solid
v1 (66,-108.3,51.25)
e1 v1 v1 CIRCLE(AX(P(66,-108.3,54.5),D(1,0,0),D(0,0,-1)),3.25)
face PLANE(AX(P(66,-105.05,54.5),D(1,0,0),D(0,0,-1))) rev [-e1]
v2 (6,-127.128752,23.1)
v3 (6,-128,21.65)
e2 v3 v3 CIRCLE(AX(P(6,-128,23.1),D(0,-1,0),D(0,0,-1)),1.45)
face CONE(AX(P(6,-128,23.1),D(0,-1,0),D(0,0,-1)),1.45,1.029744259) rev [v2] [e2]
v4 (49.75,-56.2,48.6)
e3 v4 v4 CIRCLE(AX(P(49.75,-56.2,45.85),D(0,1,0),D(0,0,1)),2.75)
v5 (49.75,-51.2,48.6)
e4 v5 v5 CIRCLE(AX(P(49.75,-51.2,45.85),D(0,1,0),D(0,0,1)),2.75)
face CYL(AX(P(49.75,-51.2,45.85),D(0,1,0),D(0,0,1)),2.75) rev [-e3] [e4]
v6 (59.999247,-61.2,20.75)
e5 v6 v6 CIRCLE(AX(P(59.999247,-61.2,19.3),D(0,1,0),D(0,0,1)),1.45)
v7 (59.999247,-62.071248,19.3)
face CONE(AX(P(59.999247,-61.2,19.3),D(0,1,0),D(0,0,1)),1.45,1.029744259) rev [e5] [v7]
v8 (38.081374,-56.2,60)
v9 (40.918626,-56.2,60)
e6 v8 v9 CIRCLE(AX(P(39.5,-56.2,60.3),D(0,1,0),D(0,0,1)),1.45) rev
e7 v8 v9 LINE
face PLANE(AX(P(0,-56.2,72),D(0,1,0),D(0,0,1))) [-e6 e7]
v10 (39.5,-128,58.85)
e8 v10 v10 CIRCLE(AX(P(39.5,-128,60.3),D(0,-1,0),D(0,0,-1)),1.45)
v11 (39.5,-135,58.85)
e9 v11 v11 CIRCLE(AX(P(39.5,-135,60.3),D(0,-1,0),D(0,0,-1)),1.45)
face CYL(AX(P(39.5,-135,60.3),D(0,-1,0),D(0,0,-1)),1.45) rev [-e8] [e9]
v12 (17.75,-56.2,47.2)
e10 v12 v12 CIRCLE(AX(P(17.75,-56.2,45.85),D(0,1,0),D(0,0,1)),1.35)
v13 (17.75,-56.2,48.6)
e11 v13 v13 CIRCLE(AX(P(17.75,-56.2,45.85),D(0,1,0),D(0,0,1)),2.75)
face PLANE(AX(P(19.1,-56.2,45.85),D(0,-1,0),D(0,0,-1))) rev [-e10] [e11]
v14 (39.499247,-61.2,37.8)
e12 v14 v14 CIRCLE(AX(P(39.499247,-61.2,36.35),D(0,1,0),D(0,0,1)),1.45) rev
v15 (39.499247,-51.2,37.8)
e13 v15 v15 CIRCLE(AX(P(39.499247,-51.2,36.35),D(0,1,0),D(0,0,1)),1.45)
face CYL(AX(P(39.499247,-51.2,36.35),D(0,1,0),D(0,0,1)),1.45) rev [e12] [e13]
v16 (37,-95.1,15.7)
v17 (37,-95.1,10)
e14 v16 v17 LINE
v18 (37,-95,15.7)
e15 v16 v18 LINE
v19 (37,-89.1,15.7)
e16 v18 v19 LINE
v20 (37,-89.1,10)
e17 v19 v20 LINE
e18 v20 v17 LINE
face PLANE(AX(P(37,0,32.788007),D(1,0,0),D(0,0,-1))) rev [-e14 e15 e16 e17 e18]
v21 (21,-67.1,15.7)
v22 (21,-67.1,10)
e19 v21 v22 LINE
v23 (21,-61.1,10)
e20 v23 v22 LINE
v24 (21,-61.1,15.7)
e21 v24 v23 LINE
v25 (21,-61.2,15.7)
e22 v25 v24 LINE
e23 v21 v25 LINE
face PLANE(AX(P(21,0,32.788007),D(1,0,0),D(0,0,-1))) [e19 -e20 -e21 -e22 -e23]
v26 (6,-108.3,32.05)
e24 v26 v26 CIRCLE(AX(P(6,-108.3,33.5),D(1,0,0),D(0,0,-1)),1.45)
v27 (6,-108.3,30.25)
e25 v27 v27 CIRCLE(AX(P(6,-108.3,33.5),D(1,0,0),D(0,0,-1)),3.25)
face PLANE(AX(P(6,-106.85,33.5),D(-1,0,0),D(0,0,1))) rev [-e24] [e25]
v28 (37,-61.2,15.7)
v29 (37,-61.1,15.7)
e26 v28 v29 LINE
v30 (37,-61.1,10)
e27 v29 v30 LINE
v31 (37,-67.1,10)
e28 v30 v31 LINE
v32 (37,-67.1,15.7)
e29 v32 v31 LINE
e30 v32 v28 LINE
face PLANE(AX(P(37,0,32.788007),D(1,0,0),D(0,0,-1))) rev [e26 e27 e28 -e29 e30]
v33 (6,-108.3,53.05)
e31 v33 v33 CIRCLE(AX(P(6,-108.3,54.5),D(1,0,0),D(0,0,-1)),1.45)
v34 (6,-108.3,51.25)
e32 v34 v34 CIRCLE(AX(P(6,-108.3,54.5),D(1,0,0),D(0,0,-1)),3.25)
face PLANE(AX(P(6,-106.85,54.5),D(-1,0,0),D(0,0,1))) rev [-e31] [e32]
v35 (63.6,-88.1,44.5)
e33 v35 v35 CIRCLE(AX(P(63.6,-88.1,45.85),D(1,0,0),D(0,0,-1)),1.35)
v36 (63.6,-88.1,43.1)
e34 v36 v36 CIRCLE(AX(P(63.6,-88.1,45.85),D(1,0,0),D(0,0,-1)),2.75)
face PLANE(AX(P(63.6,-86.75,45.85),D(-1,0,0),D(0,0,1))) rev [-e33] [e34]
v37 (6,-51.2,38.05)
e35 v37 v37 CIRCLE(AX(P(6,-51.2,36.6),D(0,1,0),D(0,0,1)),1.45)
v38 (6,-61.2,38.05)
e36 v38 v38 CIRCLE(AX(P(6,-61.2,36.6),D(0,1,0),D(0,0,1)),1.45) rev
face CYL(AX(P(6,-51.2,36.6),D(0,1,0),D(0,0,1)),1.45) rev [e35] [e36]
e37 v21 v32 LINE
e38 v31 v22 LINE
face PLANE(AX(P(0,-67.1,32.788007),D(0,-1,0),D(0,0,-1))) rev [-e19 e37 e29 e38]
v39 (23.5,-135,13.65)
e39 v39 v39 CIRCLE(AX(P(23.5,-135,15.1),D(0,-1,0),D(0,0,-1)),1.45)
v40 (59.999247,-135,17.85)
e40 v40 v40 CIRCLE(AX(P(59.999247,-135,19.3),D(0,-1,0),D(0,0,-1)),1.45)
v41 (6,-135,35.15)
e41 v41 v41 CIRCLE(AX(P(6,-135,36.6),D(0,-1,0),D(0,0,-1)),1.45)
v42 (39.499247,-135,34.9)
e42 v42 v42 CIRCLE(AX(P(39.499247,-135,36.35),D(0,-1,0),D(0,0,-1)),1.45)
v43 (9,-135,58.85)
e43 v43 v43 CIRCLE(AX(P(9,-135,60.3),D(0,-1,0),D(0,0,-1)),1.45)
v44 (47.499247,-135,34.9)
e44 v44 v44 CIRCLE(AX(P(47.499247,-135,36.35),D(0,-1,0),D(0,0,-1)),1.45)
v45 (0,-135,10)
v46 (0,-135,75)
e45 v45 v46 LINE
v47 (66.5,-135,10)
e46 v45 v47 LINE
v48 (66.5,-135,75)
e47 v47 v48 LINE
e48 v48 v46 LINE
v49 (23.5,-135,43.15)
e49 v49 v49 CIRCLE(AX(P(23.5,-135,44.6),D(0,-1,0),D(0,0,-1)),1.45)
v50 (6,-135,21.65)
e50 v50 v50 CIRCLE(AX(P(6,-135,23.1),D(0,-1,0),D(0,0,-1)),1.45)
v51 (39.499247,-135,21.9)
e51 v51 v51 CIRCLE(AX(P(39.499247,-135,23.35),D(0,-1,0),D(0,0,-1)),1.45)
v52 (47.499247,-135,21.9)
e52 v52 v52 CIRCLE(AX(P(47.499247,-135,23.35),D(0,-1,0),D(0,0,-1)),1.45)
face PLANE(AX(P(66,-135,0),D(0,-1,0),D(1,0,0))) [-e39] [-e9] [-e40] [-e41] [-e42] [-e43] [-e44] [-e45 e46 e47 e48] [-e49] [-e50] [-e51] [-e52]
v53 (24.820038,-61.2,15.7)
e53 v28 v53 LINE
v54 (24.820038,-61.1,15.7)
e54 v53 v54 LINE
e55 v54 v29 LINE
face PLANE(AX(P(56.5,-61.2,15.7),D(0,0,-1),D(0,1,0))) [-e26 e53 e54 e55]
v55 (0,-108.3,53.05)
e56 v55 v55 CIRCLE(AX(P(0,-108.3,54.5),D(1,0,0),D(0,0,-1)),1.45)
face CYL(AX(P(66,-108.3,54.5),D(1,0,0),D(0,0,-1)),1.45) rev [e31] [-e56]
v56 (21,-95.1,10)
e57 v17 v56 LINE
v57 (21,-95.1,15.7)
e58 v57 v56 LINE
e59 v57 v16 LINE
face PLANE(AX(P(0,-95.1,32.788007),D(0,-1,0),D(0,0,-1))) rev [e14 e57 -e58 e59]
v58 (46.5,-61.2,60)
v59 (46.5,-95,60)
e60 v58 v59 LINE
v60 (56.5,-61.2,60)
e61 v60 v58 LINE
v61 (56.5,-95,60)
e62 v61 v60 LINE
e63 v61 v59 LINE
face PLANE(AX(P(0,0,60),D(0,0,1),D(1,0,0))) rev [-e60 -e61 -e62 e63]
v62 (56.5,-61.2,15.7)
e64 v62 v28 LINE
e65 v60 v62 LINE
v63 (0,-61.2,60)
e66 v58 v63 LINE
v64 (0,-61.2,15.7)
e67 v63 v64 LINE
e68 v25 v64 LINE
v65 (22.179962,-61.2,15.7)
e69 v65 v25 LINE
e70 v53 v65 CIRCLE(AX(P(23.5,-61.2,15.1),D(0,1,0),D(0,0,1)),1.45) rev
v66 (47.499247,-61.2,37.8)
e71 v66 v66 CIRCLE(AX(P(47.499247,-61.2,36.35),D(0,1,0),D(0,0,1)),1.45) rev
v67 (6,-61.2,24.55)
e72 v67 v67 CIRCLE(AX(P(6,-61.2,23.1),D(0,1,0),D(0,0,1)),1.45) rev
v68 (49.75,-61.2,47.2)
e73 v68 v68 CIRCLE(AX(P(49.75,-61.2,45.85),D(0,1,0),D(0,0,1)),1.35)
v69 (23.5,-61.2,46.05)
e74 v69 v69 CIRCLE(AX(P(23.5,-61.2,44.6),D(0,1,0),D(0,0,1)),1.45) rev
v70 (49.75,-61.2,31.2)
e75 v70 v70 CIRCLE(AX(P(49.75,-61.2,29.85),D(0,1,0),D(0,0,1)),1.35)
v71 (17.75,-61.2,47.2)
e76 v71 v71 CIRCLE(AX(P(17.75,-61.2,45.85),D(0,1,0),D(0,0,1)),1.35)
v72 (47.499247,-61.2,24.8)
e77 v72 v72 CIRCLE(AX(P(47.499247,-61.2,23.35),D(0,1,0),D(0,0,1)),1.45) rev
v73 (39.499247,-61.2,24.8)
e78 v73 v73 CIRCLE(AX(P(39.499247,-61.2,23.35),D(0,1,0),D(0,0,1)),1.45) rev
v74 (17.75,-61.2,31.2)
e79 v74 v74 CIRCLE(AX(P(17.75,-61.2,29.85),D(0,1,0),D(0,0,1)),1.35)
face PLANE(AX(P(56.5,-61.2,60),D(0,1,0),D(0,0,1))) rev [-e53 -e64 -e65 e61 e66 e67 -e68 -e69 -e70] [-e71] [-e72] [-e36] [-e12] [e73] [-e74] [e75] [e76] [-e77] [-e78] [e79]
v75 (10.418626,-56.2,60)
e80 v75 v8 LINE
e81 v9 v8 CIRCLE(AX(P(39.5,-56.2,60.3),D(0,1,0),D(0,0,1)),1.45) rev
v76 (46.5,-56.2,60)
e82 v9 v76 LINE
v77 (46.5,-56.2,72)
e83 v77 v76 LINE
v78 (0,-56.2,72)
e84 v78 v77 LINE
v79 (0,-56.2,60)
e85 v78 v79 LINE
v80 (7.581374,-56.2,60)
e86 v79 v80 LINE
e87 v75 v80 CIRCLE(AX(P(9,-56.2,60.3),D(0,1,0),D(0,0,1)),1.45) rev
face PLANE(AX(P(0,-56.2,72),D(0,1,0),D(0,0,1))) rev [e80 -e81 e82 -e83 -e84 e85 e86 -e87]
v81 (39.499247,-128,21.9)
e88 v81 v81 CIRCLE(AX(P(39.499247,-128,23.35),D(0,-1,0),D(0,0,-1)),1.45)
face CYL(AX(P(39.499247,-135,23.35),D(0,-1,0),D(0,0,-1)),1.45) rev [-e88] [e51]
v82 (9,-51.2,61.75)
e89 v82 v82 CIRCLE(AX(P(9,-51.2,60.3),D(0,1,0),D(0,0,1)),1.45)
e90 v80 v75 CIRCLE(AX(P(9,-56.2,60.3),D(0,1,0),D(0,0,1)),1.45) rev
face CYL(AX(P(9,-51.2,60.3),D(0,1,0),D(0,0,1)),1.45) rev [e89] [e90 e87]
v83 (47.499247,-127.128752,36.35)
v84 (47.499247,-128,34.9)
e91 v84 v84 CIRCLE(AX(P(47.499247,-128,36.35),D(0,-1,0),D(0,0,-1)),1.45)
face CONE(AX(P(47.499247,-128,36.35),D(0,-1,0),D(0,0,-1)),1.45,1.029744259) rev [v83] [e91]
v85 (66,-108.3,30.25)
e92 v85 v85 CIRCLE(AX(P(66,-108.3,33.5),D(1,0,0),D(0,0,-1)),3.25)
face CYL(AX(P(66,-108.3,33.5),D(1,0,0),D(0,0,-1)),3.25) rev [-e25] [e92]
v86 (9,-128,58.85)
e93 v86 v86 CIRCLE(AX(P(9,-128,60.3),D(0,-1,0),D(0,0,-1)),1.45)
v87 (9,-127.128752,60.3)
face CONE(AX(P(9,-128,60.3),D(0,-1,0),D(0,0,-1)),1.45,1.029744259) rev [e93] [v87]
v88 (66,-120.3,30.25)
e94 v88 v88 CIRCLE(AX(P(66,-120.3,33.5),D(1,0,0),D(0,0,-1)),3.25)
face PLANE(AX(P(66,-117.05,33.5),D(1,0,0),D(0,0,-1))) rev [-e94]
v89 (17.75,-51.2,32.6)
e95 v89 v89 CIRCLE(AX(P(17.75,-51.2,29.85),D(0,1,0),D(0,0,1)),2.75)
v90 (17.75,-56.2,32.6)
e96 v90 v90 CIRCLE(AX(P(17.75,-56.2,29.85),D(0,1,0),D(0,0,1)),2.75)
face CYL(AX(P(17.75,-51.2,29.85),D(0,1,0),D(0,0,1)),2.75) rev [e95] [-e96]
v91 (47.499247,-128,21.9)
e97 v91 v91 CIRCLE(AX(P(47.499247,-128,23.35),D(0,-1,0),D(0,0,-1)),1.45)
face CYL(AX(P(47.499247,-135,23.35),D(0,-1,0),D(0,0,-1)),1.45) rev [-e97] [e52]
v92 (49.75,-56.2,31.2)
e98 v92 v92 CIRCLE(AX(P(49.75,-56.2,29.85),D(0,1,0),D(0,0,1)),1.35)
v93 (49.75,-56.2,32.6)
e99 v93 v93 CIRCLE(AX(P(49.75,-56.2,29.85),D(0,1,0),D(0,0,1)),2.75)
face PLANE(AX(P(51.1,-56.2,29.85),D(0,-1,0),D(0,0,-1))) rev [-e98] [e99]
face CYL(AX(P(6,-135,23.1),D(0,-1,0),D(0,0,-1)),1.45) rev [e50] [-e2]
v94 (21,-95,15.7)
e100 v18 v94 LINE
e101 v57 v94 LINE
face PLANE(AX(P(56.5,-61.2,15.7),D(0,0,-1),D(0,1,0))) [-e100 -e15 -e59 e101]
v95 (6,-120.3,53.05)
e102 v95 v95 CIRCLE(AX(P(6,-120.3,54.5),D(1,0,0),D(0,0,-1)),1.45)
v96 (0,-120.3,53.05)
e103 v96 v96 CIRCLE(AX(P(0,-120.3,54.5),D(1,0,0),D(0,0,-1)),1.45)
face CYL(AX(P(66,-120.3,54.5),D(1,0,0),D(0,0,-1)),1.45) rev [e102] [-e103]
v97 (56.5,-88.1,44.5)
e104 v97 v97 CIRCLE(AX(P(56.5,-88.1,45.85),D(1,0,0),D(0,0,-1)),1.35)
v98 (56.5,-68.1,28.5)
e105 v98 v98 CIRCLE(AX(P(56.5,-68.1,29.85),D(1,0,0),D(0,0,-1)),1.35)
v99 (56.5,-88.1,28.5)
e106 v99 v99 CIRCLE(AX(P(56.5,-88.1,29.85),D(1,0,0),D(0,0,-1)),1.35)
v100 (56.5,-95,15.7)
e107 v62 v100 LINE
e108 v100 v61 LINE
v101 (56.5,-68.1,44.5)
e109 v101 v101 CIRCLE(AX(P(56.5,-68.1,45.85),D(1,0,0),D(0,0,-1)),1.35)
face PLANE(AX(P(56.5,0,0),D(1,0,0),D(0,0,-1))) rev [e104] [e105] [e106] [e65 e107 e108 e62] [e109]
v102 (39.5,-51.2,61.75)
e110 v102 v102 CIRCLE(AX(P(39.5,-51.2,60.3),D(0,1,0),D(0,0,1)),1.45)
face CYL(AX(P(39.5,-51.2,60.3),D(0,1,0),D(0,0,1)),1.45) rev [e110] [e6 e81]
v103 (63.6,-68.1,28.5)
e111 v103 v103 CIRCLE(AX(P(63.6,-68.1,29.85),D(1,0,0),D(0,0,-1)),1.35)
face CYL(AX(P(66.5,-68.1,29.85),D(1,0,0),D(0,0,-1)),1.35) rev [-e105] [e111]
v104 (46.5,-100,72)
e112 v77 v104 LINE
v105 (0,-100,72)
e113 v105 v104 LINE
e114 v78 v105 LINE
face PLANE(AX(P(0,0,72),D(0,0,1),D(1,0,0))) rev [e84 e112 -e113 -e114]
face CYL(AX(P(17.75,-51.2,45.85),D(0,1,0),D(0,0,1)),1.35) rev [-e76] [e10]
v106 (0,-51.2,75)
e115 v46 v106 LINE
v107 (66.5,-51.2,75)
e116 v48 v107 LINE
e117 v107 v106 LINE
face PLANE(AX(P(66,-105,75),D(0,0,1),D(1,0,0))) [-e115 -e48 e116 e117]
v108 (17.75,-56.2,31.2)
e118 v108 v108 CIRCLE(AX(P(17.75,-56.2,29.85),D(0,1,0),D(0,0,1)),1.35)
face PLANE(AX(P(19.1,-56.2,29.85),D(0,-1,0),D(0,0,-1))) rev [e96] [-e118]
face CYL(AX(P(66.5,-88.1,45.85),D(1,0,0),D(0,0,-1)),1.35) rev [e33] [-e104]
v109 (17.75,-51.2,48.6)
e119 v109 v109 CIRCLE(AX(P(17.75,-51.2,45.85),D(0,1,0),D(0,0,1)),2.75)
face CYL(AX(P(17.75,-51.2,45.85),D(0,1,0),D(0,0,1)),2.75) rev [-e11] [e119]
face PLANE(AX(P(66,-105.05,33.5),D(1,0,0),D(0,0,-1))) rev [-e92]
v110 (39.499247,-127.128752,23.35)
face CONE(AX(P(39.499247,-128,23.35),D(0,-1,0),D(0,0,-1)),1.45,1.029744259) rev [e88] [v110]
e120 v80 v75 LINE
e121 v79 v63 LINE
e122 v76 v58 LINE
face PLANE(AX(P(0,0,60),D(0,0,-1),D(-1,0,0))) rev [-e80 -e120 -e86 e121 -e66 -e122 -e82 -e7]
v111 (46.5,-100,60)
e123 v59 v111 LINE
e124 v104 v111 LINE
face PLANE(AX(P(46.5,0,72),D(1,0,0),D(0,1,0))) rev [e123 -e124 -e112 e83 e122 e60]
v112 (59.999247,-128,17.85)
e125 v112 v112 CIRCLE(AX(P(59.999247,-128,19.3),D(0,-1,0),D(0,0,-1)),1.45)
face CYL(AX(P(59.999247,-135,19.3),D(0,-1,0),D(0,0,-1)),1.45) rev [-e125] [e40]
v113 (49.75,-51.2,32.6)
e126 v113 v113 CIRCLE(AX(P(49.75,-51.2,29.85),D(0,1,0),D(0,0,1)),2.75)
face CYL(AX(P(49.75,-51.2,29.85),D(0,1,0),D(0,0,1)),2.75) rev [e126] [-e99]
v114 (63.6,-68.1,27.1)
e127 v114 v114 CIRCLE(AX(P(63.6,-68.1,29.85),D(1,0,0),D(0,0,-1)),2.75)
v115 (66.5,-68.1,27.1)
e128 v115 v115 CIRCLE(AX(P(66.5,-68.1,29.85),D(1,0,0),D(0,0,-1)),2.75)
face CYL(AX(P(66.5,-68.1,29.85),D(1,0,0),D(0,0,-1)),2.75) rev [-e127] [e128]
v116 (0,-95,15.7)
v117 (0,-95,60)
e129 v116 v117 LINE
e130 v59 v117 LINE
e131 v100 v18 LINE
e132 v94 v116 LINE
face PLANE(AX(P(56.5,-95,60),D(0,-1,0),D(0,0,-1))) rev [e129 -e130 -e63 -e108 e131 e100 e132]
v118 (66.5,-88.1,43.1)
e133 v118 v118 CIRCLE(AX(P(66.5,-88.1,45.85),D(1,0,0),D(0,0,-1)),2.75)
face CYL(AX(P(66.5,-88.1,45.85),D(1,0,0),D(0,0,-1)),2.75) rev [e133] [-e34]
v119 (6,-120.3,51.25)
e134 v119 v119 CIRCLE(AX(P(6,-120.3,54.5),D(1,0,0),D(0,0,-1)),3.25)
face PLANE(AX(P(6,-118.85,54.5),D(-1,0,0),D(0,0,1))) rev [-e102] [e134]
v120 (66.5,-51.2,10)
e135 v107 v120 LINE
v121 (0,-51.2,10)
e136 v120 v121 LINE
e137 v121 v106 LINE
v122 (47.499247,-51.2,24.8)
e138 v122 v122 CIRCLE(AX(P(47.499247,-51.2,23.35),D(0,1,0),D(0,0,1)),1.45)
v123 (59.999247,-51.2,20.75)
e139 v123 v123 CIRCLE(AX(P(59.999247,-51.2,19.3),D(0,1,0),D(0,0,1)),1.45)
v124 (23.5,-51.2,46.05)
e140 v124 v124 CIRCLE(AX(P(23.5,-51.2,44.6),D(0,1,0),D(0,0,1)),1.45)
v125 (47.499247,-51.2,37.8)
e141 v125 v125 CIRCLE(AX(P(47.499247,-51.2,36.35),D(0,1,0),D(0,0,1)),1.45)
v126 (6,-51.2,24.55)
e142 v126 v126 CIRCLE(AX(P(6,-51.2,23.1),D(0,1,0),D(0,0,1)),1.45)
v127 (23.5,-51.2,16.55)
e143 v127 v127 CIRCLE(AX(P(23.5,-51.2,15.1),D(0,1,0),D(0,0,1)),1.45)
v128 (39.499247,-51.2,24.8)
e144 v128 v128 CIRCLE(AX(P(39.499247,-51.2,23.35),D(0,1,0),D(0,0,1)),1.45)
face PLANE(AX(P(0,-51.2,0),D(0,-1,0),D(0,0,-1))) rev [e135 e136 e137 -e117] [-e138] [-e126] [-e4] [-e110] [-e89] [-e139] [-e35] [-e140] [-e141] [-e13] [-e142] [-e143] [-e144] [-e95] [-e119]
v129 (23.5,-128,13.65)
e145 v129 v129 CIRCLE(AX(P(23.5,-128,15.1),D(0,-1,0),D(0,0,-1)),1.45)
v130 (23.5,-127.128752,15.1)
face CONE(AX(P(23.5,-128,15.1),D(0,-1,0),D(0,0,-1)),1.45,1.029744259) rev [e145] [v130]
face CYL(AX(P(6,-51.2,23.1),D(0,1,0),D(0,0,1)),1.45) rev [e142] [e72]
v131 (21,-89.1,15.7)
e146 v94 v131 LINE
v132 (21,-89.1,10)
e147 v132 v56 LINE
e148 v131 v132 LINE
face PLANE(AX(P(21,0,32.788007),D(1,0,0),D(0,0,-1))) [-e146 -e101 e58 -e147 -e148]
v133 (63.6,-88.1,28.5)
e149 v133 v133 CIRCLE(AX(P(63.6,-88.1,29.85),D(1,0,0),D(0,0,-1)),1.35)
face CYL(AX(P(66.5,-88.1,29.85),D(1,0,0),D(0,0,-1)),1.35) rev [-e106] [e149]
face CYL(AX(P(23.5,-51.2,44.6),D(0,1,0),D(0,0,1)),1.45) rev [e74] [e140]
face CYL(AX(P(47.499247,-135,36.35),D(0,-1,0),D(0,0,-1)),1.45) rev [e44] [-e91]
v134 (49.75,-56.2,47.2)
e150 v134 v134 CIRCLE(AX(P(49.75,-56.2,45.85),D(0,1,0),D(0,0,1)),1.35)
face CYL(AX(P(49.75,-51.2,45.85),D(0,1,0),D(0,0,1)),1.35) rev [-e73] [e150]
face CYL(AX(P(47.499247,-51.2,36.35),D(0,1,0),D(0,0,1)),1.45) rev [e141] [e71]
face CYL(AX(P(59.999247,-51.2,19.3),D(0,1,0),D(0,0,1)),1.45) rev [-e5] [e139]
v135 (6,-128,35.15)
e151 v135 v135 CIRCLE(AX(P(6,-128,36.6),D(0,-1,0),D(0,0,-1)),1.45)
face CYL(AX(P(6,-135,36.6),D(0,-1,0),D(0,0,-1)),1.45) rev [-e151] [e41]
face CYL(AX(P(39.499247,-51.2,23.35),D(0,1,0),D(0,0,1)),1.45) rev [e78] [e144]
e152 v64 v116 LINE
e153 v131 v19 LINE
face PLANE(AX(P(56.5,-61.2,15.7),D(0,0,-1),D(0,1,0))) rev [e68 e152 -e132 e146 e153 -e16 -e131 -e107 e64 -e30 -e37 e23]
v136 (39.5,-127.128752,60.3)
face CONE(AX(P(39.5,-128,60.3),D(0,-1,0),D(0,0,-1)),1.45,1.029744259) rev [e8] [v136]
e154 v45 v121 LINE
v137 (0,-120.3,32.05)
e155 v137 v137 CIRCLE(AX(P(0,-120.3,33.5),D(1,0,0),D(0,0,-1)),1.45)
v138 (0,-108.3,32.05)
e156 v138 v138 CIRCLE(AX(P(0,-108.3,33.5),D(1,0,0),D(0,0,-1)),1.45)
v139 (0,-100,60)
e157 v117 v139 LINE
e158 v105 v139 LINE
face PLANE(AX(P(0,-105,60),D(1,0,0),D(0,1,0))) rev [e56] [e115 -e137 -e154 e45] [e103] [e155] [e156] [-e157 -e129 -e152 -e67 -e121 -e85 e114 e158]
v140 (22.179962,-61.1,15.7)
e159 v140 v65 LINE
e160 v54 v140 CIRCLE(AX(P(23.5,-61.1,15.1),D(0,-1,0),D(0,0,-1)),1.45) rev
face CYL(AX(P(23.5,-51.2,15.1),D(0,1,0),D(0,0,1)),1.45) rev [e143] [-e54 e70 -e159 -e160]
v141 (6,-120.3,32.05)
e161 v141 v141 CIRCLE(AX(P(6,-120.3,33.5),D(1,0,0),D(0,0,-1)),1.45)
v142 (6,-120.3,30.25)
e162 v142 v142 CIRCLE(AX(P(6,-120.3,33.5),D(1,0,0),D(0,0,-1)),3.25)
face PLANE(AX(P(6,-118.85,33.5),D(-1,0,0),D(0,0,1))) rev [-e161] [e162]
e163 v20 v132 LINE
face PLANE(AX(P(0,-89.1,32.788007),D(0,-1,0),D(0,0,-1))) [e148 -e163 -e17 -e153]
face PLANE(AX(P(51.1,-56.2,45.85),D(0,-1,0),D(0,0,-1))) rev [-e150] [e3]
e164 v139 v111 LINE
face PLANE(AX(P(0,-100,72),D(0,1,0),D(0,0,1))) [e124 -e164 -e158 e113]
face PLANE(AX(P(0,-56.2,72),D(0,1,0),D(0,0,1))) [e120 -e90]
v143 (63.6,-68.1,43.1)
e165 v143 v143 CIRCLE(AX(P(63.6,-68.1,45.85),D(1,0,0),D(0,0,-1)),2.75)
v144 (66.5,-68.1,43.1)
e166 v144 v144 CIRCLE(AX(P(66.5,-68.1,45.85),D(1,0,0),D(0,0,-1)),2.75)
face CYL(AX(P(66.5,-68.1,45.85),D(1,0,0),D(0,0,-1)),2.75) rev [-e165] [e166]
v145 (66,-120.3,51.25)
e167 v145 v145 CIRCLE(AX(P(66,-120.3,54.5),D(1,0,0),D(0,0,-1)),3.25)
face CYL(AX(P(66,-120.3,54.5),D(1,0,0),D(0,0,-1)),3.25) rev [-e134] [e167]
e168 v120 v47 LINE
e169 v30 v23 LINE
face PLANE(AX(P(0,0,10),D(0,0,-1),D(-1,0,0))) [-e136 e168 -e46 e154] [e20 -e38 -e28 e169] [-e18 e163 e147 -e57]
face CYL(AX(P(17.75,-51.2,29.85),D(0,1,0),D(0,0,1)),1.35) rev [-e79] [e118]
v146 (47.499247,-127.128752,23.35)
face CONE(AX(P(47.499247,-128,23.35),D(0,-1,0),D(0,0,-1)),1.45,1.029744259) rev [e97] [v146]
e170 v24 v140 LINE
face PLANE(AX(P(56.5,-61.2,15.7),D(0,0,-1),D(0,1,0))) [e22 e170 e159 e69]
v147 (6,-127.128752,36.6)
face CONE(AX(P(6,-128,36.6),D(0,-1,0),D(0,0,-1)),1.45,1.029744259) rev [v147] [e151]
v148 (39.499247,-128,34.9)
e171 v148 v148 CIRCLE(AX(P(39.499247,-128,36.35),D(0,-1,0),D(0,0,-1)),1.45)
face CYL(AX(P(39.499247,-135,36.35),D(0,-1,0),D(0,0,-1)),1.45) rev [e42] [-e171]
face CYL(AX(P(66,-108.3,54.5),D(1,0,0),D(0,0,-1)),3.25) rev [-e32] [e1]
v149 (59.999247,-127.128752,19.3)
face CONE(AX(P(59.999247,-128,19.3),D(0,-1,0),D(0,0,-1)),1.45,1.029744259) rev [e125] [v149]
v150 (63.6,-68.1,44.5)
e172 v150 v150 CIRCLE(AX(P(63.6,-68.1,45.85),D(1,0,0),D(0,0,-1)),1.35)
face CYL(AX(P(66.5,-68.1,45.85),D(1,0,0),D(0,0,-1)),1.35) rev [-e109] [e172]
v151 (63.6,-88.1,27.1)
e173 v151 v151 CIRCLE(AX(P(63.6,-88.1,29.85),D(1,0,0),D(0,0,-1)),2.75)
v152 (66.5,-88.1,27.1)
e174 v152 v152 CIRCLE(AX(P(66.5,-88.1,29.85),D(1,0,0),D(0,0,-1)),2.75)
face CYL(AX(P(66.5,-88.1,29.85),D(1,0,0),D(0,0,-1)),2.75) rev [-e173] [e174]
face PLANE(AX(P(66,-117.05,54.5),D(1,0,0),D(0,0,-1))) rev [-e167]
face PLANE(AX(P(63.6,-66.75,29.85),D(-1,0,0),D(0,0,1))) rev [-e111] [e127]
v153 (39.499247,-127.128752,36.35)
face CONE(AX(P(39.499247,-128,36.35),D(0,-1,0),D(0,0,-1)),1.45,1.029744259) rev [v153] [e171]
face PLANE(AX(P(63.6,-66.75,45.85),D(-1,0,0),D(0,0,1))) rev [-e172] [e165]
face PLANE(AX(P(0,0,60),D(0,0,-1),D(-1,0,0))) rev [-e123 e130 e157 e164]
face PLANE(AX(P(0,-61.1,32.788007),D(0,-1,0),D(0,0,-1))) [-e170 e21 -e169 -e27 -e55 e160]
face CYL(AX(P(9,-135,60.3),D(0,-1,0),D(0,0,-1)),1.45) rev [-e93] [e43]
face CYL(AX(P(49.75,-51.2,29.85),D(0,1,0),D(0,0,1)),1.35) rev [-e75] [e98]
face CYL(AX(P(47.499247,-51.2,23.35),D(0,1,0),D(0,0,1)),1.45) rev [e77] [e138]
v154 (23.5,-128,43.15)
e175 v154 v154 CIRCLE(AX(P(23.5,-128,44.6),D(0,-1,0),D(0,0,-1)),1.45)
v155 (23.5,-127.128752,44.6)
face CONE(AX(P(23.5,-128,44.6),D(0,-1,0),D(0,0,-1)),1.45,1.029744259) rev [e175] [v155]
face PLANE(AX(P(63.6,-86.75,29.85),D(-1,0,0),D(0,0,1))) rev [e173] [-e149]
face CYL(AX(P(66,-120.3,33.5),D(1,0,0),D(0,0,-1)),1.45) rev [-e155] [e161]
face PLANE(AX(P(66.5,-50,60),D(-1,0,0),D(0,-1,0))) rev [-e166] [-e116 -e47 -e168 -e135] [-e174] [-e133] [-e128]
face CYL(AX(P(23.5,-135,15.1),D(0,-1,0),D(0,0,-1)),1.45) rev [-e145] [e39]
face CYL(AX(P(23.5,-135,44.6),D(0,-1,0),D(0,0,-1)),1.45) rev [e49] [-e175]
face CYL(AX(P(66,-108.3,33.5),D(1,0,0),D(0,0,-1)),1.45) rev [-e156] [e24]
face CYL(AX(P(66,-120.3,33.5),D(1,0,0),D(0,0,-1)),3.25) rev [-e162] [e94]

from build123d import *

# Parameters (mm, degrees)
EXTRUDE_1_DEPTH                 = 60
SKETCH_3_W                      = 44.3
SKETCH_3_H                      = 33.8
CUT_EXTRUDE_1_DEPTH             = 56.5
SKETCH_4_W                      = 75
SKETCH_4_H                      = 30
EXTRUDE_2_DEPTH                 = 66
SKETCH_5_W                      = 59.221662283
SKETCH_5_H                      = 50
CUT_EXTRUDE_2_DEPTH             = 65
SKETCH_34_W                     = 75
SKETCH_34_H                     = 30
EXTRUDE_5_DEPTH                 = 0.5
HOLE_WIZARD_M3_1_AT_2_COUNT     = 2
HOLE_WIZARD_M3_1_AT_2_PITCH     = 21
HOLE_WIZARD_M3_1_AT_3_COUNT     = 2
HOLE_WIZARD_M3_1_AT_3_PITCH     = 24.186773245
HOLE_WIZARD_M3_1_AT_4_COUNT     = 2
HOLE_WIZARD_M3_1_AT_4_PITCH     = 12
SKETCH_9_W                      = 201.131722391
SKETCH_9_H                      = 182.70094424
CUT_EXTRUDE_3_DEPTH             = 10
SKETCH_10_W                     = 66.5
SKETCH_10_H                     = 50
CUT_EXTRUDE_4_DEPTH             = 1.2
HOLE_WIZARD_M2_5_1_D            = 2.7
HOLE_WIZARD_M2_5_1_CBORE_D      = 5.5
HOLE_WIZARD_M2_5_1_CBORE_DEPTH  = 2.9
EXTRUDE_3_DEPTH                 = 12
SKETCH_16_W                     = 66.5
SKETCH_16_H                     = 53.8
EXTRUDE_4_DEPTH                 = 3
HOLE_WIZARD_M2_5_2_D            = 2.7
HOLE_WIZARD_M2_5_2_DEPTH        = 10
HOLE_WIZARD_M2_5_2_CBORE_D      = 5.5
HOLE_WIZARD_M2_5_2_CBORE_DEPTH  = 5
HOLE_START                      = -61.2
HOLE_WIZARD_2_9_2_9_1_OUTLINE_R = 1.45
HOLE_WIZARD_2_9_2_9_1_DEPTH     = 10
HOLE_START_2                    = -56.2
HOLE_WIZARD_2_9_2_9_2_OUTLINE_R = 1.45
HOLE_WIZARD_2_9_2_9_2_DEPTH     = 5
HOLE_WIZARD_2_9_2_9_4_D         = 2.9
HOLE_WIZARD_2_9_2_9_4_DEPTH     = 7
HOLE_WIZARD_2_9_2_9_4_TIP       = 0.871247898
CUT_EXTRUDE_5_REACH             = 165.928


# Read off the part's stored shape, not the designer's step: Ø2.9 (2.9) 直径孔1, Ø2.9 (2.9) 直径孔2, Ø2.9 (2.9) 直径孔3
with BuildPart() as part:
    # 草图2 → 凸台-拉伸1 (new body)
    with BuildSketch(Plane.XY):
        Polygon((0, 0), (15.232865332, 0), (15.232865332, -50), (66.5, -50), (66.5, -105), (0, -105), align=None)
    extrude(amount=EXTRUDE_1_DEPTH)

    # 草图3 → 切除-拉伸1 (cut)
    with BuildSketch(Plane.ZY):
        with Locations((37.85, -78.1)):
            Rectangle(SKETCH_3_W, SKETCH_3_H)
    extrude(amount=-CUT_EXTRUDE_1_DEPTH, mode=Mode.SUBTRACT)

    # 草图4 → 凸台-拉伸2 (add)
    with BuildSketch(Plane.ZY):
        with Locations((37.5, -120)):
            Rectangle(SKETCH_4_W, SKETCH_4_H)
    extrude(amount=-EXTRUDE_2_DEPTH)

    # 草图5 → 切除-拉伸2 (cut)
    with BuildSketch(Plane.XY.offset(60)):
        with Locations((-14.37796581, -25)):
            Rectangle(SKETCH_5_W, SKETCH_5_H)
    extrude(amount=-CUT_EXTRUDE_2_DEPTH, mode=Mode.SUBTRACT)

    # 草图34 → 凸台-拉伸5 (add)
    with BuildSketch(Plane(origin=(66, 0, 0), x_dir=(0, 0, -1), z_dir=(1, 0, 0))):
        with Locations((-37.5, -120)):
            Rectangle(SKETCH_34_W, SKETCH_34_H)
    extrude(amount=EXTRUDE_5_DEPTH)

    # 草图8 → M3 六角凹头螺钉的柱形沉头孔1 (revolve, cut)
    with BuildSketch(Plane(origin=(66, -108.3, 54.5), x_dir=(0, 0, -1), z_dir=(0, 1, 0))):
        Polygon((0, 0), (0, 66), (1.45, 66), (1.45, 60), (3.25, 60), (3.25, 0), align=None)
    hole_wizard_m3_1 = revolve(axis=Axis((72.35, -108.3, 54.5), (-1, 0, 0)), mode=Mode.SUBTRACT)

    # M3 六角凹头螺钉的柱形沉头孔1 at 2: M3 六角凹头螺钉的柱形沉头孔1 ×2
    with Locations(*[(0, 0, -i * HOLE_WIZARD_M3_1_AT_2_PITCH) for i in range(1, HOLE_WIZARD_M3_1_AT_2_COUNT)]):
        add(hole_wizard_m3_1, mode=Mode.SUBTRACT)

    # M3 六角凹头螺钉的柱形沉头孔1 at 3: M3 六角凹头螺钉的柱形沉头孔1 ×2
    with Locations(*[Vector(0, -0.4961389383568334, -0.8682431421244595) * (i * HOLE_WIZARD_M3_1_AT_3_PITCH) for i in range(1, HOLE_WIZARD_M3_1_AT_3_COUNT)]):
        add(hole_wizard_m3_1, mode=Mode.SUBTRACT)

    # M3 六角凹头螺钉的柱形沉头孔1 at 4: M3 六角凹头螺钉的柱形沉头孔1 ×2
    with Locations(*[(0, -i * HOLE_WIZARD_M3_1_AT_4_PITCH, 0) for i in range(1, HOLE_WIZARD_M3_1_AT_4_COUNT)]):
        add(hole_wizard_m3_1, mode=Mode.SUBTRACT)

    # 草图9 → 切除-拉伸3 (cut)
    with BuildSketch(Plane(origin=(0, 0, 0), x_dir=(-1, 0, 0), z_dir=(0, 0, -1))):
        with Locations((-9.064738267, -112.548341422)):
            Rectangle(SKETCH_9_W, SKETCH_9_H)
    extrude(amount=-CUT_EXTRUDE_3_DEPTH, mode=Mode.SUBTRACT)

    # 草图10 → 切除-拉伸4 (cut)
    with BuildSketch(Plane(origin=(0, -50, 0), x_dir=(1, 0, 0), z_dir=(0, 1, 0))):
        with Locations((33.25, -35)):
            Rectangle(SKETCH_10_W, SKETCH_10_H)
    extrude(amount=-CUT_EXTRUDE_4_DEPTH, mode=Mode.SUBTRACT)

    # M2.5 六角凹头螺钉的柱形沉头孔1 (through all)
    with Locations(Plane(origin=(66.5, 0, 0), x_dir=(0, 0, -1), z_dir=(1, 0, 0))):
        with Locations((-29.85, -68.1), (-45.85, -68.1), (-45.85, -88.1), (-29.85, -88.1)):
            CounterBoreHole(HOLE_WIZARD_M2_5_1_D / 2, HOLE_WIZARD_M2_5_1_CBORE_D / 2, HOLE_WIZARD_M2_5_1_CBORE_DEPTH)

    # 草图15 → 凸台-拉伸3 (add)
    with BuildSketch(Plane.XY.offset(60)):
        Polygon((66.5, -105), (66.5, -51.2), (0, -51.2), (0, -56.2), (46.5, -56.2), (46.5, -100), (0, -100), (0, -105), align=None)
    extrude(amount=EXTRUDE_3_DEPTH)

    # 草图16 → 凸台-拉伸4 (add)
    with BuildSketch(Plane.XY.offset(72)):
        with Locations((33.25, -78.1)):
            Rectangle(SKETCH_16_W, SKETCH_16_H)
    extrude(amount=EXTRUDE_4_DEPTH)

    # M2.5 六角凹头螺钉的柱形沉头孔2
    with Locations(Plane(origin=(0, -51.2, 0), x_dir=(1, 0, 0), z_dir=(0, 1, 0))):
        with Locations((17.75, -45.85), (17.75, -29.85), (49.75, -29.85), (49.75, -45.85)):
            CounterBoreHole(HOLE_WIZARD_M2_5_2_D / 2, HOLE_WIZARD_M2_5_2_CBORE_D / 2, HOLE_WIZARD_M2_5_2_CBORE_DEPTH, depth=HOLE_WIZARD_M2_5_2_DEPTH)

    # Ø2.9 (2.9) 直径孔1 outline → Ø2.9 (2.9) 直径孔1 (cut)
    with BuildSketch(Plane(origin=(0, 0, 0), x_dir=(1, 0, 0), z_dir=(0, 1, 0)).offset(HOLE_START)):
        with Locations((39.499246981, -23.35)):
            Circle(HOLE_WIZARD_2_9_2_9_1_OUTLINE_R)
        with Locations((47.499246981, -36.35)):
            Circle(HOLE_WIZARD_2_9_2_9_1_OUTLINE_R)
        with Locations((47.499246981, -23.35)):
            Circle(HOLE_WIZARD_2_9_2_9_1_OUTLINE_R)
        with Locations((39.499246981, -36.35)):
            Circle(HOLE_WIZARD_2_9_2_9_1_OUTLINE_R)
        with Locations((23.5, -44.6)):
            Circle(HOLE_WIZARD_2_9_2_9_1_OUTLINE_R)
        with Locations((23.5, -15.1)):
            Circle(HOLE_WIZARD_2_9_2_9_1_OUTLINE_R)
        with Locations((6, -23.1)):
            Circle(HOLE_WIZARD_2_9_2_9_1_OUTLINE_R)
        with Locations((6, -36.6)):
            Circle(HOLE_WIZARD_2_9_2_9_1_OUTLINE_R)
    extrude(amount=HOLE_WIZARD_2_9_2_9_1_DEPTH, mode=Mode.SUBTRACT)

    # Ø2.9 (2.9) 直径孔2 outline → Ø2.9 (2.9) 直径孔2 (cut)
    with BuildSketch(Plane(origin=(0, 0, 0), x_dir=(1, 0, 0), z_dir=(0, 1, 0)).offset(HOLE_START_2)):
        with Locations((39.5, -60.3)):
            Circle(HOLE_WIZARD_2_9_2_9_2_OUTLINE_R)
        with Locations((9, -60.3)):
            Circle(HOLE_WIZARD_2_9_2_9_2_OUTLINE_R)
    extrude(amount=HOLE_WIZARD_2_9_2_9_2_DEPTH, mode=Mode.SUBTRACT)

    # Ø2.9 (2.9) 直径孔3 outline → Ø2.9 (2.9) 直径孔3 (revolve, cut)
    with BuildSketch(Plane(origin=(59.999246981, 0, 19.3), x_dir=(1, 0, 0), z_dir=(0, 0, 1))):
        Polygon((0, -51.2), (0, -62.071247898), (1.45, -61.2), (1.45, -51.2), align=None)
    revolve(axis=Axis((59.999246981, 0, 19.3), (0, 1, 0)), mode=Mode.SUBTRACT)

    # Ø2.9 (2.9) 直径孔4
    with Locations(Plane(origin=(0, -135, 0), x_dir=(-1, 0, 0), z_dir=(0, -1, 0))):
        with Locations((-23.5, -15.1), (-39.499246981, -23.35), (-47.499246981, -23.35), (-59.999246981, -19.3), (-47.499246981, -36.35), (-39.499246981, -36.35), (-39.5, -60.3), (-23.5, -44.6), (-6, -36.6), (-6, -23.1), (-9, -60.3)):
            Hole(HOLE_WIZARD_2_9_2_9_4_D / 2, depth=HOLE_WIZARD_2_9_2_9_4_DEPTH)
            with Locations((0, 0, -(HOLE_WIZARD_2_9_2_9_4_DEPTH + HOLE_WIZARD_2_9_2_9_4_TIP / 2))):  # 118° drill point
                Cone(0, HOLE_WIZARD_2_9_2_9_4_D / 2, HOLE_WIZARD_2_9_2_9_4_TIP, mode=Mode.SUBTRACT)

    # 切除-拉伸5: up to this face of the body (flat: up to its plane)
    cut_extrude_5_end = Plane(part.part.faces().sort_by_distance((28.25, -78.1, 15.7))[0])
    # 草图33 → 切除-拉伸5 (cut, up to the picked face)
    with BuildSketch(Plane(origin=(0, 0, 10), x_dir=(-1, 0, 0), z_dir=(0, 0, -1)), mode=Mode.PRIVATE) as cut_extrude_5_sk1:
        Polygon((-21, -61.1), (-37, -61.1), (-34.176470588, -67.1), (-21, -67.1), align=None)
    cut_extrude_5_tool1 = split(extrude(cut_extrude_5_sk1.sketch, amount=-CUT_EXTRUDE_5_REACH, mode=Mode.PRIVATE), bisect_by=cut_extrude_5_end, keep=Keep.BOTH, mode=Mode.PRIVATE)
    # 草图33 → 切除-拉伸5 (cut, up to the picked face)
    with BuildSketch(Plane(origin=(0, 0, 10), x_dir=(-1, 0, 0), z_dir=(0, 0, -1)), mode=Mode.PRIVATE) as cut_extrude_5_sk2:
        Polygon((-23.823529412, -89.1), (-37, -89.1), (-37, -95.1), (-21, -95.1), align=None)
    cut_extrude_5_tool2 = split(extrude(cut_extrude_5_sk2.sketch, amount=-CUT_EXTRUDE_5_REACH, mode=Mode.PRIVATE), bisect_by=cut_extrude_5_end, keep=Keep.BOTH, mode=Mode.PRIVATE)
    # 草图33 → 切除-拉伸5 (cut, up to the picked face)
    with BuildSketch(Plane(origin=(0, 0, 10), x_dir=(-1, 0, 0), z_dir=(0, 0, -1)), mode=Mode.PRIVATE) as cut_extrude_5_sk3:
        Polygon((-21, -89.1), (-23.823529412, -89.1), (-21, -95.1), align=None)
    cut_extrude_5_tool3 = split(extrude(cut_extrude_5_sk3.sketch, amount=-CUT_EXTRUDE_5_REACH, mode=Mode.PRIVATE), bisect_by=cut_extrude_5_end, keep=Keep.BOTH, mode=Mode.PRIVATE)
    # 草图33 → 切除-拉伸5 (cut, up to the picked face)
    with BuildSketch(Plane(origin=(0, 0, 10), x_dir=(-1, 0, 0), z_dir=(0, 0, -1)), mode=Mode.PRIVATE) as cut_extrude_5_sk4:
        Polygon((-34.176470588, -67.1), (-37, -61.1), (-37, -67.1), align=None)
    cut_extrude_5_tool4 = split(extrude(cut_extrude_5_sk4.sketch, amount=-CUT_EXTRUDE_5_REACH, mode=Mode.PRIVATE), bisect_by=cut_extrude_5_end, keep=Keep.BOTH, mode=Mode.PRIVATE)
    add(cut_extrude_5_tool1.solids().sort_by(Axis((28.316888, -64.003226, 10), (0, 0, 1)))[0], mode=Mode.SUBTRACT)
    add(cut_extrude_5_tool2.solids().sort_by(Axis((29.683112, -92.196774, 10), (0, 0, 1)))[0], mode=Mode.SUBTRACT)
    add(cut_extrude_5_tool3.solids().sort_by(Axis((21.941176, -91.1, 10), (0, 0, 1)))[0], mode=Mode.SUBTRACT)
    add(cut_extrude_5_tool4.solids().sort_by(Axis((36.058824, -65.1, 10), (0, 0, 1)))[0], mode=Mode.SUBTRACT)


solid = part.part
